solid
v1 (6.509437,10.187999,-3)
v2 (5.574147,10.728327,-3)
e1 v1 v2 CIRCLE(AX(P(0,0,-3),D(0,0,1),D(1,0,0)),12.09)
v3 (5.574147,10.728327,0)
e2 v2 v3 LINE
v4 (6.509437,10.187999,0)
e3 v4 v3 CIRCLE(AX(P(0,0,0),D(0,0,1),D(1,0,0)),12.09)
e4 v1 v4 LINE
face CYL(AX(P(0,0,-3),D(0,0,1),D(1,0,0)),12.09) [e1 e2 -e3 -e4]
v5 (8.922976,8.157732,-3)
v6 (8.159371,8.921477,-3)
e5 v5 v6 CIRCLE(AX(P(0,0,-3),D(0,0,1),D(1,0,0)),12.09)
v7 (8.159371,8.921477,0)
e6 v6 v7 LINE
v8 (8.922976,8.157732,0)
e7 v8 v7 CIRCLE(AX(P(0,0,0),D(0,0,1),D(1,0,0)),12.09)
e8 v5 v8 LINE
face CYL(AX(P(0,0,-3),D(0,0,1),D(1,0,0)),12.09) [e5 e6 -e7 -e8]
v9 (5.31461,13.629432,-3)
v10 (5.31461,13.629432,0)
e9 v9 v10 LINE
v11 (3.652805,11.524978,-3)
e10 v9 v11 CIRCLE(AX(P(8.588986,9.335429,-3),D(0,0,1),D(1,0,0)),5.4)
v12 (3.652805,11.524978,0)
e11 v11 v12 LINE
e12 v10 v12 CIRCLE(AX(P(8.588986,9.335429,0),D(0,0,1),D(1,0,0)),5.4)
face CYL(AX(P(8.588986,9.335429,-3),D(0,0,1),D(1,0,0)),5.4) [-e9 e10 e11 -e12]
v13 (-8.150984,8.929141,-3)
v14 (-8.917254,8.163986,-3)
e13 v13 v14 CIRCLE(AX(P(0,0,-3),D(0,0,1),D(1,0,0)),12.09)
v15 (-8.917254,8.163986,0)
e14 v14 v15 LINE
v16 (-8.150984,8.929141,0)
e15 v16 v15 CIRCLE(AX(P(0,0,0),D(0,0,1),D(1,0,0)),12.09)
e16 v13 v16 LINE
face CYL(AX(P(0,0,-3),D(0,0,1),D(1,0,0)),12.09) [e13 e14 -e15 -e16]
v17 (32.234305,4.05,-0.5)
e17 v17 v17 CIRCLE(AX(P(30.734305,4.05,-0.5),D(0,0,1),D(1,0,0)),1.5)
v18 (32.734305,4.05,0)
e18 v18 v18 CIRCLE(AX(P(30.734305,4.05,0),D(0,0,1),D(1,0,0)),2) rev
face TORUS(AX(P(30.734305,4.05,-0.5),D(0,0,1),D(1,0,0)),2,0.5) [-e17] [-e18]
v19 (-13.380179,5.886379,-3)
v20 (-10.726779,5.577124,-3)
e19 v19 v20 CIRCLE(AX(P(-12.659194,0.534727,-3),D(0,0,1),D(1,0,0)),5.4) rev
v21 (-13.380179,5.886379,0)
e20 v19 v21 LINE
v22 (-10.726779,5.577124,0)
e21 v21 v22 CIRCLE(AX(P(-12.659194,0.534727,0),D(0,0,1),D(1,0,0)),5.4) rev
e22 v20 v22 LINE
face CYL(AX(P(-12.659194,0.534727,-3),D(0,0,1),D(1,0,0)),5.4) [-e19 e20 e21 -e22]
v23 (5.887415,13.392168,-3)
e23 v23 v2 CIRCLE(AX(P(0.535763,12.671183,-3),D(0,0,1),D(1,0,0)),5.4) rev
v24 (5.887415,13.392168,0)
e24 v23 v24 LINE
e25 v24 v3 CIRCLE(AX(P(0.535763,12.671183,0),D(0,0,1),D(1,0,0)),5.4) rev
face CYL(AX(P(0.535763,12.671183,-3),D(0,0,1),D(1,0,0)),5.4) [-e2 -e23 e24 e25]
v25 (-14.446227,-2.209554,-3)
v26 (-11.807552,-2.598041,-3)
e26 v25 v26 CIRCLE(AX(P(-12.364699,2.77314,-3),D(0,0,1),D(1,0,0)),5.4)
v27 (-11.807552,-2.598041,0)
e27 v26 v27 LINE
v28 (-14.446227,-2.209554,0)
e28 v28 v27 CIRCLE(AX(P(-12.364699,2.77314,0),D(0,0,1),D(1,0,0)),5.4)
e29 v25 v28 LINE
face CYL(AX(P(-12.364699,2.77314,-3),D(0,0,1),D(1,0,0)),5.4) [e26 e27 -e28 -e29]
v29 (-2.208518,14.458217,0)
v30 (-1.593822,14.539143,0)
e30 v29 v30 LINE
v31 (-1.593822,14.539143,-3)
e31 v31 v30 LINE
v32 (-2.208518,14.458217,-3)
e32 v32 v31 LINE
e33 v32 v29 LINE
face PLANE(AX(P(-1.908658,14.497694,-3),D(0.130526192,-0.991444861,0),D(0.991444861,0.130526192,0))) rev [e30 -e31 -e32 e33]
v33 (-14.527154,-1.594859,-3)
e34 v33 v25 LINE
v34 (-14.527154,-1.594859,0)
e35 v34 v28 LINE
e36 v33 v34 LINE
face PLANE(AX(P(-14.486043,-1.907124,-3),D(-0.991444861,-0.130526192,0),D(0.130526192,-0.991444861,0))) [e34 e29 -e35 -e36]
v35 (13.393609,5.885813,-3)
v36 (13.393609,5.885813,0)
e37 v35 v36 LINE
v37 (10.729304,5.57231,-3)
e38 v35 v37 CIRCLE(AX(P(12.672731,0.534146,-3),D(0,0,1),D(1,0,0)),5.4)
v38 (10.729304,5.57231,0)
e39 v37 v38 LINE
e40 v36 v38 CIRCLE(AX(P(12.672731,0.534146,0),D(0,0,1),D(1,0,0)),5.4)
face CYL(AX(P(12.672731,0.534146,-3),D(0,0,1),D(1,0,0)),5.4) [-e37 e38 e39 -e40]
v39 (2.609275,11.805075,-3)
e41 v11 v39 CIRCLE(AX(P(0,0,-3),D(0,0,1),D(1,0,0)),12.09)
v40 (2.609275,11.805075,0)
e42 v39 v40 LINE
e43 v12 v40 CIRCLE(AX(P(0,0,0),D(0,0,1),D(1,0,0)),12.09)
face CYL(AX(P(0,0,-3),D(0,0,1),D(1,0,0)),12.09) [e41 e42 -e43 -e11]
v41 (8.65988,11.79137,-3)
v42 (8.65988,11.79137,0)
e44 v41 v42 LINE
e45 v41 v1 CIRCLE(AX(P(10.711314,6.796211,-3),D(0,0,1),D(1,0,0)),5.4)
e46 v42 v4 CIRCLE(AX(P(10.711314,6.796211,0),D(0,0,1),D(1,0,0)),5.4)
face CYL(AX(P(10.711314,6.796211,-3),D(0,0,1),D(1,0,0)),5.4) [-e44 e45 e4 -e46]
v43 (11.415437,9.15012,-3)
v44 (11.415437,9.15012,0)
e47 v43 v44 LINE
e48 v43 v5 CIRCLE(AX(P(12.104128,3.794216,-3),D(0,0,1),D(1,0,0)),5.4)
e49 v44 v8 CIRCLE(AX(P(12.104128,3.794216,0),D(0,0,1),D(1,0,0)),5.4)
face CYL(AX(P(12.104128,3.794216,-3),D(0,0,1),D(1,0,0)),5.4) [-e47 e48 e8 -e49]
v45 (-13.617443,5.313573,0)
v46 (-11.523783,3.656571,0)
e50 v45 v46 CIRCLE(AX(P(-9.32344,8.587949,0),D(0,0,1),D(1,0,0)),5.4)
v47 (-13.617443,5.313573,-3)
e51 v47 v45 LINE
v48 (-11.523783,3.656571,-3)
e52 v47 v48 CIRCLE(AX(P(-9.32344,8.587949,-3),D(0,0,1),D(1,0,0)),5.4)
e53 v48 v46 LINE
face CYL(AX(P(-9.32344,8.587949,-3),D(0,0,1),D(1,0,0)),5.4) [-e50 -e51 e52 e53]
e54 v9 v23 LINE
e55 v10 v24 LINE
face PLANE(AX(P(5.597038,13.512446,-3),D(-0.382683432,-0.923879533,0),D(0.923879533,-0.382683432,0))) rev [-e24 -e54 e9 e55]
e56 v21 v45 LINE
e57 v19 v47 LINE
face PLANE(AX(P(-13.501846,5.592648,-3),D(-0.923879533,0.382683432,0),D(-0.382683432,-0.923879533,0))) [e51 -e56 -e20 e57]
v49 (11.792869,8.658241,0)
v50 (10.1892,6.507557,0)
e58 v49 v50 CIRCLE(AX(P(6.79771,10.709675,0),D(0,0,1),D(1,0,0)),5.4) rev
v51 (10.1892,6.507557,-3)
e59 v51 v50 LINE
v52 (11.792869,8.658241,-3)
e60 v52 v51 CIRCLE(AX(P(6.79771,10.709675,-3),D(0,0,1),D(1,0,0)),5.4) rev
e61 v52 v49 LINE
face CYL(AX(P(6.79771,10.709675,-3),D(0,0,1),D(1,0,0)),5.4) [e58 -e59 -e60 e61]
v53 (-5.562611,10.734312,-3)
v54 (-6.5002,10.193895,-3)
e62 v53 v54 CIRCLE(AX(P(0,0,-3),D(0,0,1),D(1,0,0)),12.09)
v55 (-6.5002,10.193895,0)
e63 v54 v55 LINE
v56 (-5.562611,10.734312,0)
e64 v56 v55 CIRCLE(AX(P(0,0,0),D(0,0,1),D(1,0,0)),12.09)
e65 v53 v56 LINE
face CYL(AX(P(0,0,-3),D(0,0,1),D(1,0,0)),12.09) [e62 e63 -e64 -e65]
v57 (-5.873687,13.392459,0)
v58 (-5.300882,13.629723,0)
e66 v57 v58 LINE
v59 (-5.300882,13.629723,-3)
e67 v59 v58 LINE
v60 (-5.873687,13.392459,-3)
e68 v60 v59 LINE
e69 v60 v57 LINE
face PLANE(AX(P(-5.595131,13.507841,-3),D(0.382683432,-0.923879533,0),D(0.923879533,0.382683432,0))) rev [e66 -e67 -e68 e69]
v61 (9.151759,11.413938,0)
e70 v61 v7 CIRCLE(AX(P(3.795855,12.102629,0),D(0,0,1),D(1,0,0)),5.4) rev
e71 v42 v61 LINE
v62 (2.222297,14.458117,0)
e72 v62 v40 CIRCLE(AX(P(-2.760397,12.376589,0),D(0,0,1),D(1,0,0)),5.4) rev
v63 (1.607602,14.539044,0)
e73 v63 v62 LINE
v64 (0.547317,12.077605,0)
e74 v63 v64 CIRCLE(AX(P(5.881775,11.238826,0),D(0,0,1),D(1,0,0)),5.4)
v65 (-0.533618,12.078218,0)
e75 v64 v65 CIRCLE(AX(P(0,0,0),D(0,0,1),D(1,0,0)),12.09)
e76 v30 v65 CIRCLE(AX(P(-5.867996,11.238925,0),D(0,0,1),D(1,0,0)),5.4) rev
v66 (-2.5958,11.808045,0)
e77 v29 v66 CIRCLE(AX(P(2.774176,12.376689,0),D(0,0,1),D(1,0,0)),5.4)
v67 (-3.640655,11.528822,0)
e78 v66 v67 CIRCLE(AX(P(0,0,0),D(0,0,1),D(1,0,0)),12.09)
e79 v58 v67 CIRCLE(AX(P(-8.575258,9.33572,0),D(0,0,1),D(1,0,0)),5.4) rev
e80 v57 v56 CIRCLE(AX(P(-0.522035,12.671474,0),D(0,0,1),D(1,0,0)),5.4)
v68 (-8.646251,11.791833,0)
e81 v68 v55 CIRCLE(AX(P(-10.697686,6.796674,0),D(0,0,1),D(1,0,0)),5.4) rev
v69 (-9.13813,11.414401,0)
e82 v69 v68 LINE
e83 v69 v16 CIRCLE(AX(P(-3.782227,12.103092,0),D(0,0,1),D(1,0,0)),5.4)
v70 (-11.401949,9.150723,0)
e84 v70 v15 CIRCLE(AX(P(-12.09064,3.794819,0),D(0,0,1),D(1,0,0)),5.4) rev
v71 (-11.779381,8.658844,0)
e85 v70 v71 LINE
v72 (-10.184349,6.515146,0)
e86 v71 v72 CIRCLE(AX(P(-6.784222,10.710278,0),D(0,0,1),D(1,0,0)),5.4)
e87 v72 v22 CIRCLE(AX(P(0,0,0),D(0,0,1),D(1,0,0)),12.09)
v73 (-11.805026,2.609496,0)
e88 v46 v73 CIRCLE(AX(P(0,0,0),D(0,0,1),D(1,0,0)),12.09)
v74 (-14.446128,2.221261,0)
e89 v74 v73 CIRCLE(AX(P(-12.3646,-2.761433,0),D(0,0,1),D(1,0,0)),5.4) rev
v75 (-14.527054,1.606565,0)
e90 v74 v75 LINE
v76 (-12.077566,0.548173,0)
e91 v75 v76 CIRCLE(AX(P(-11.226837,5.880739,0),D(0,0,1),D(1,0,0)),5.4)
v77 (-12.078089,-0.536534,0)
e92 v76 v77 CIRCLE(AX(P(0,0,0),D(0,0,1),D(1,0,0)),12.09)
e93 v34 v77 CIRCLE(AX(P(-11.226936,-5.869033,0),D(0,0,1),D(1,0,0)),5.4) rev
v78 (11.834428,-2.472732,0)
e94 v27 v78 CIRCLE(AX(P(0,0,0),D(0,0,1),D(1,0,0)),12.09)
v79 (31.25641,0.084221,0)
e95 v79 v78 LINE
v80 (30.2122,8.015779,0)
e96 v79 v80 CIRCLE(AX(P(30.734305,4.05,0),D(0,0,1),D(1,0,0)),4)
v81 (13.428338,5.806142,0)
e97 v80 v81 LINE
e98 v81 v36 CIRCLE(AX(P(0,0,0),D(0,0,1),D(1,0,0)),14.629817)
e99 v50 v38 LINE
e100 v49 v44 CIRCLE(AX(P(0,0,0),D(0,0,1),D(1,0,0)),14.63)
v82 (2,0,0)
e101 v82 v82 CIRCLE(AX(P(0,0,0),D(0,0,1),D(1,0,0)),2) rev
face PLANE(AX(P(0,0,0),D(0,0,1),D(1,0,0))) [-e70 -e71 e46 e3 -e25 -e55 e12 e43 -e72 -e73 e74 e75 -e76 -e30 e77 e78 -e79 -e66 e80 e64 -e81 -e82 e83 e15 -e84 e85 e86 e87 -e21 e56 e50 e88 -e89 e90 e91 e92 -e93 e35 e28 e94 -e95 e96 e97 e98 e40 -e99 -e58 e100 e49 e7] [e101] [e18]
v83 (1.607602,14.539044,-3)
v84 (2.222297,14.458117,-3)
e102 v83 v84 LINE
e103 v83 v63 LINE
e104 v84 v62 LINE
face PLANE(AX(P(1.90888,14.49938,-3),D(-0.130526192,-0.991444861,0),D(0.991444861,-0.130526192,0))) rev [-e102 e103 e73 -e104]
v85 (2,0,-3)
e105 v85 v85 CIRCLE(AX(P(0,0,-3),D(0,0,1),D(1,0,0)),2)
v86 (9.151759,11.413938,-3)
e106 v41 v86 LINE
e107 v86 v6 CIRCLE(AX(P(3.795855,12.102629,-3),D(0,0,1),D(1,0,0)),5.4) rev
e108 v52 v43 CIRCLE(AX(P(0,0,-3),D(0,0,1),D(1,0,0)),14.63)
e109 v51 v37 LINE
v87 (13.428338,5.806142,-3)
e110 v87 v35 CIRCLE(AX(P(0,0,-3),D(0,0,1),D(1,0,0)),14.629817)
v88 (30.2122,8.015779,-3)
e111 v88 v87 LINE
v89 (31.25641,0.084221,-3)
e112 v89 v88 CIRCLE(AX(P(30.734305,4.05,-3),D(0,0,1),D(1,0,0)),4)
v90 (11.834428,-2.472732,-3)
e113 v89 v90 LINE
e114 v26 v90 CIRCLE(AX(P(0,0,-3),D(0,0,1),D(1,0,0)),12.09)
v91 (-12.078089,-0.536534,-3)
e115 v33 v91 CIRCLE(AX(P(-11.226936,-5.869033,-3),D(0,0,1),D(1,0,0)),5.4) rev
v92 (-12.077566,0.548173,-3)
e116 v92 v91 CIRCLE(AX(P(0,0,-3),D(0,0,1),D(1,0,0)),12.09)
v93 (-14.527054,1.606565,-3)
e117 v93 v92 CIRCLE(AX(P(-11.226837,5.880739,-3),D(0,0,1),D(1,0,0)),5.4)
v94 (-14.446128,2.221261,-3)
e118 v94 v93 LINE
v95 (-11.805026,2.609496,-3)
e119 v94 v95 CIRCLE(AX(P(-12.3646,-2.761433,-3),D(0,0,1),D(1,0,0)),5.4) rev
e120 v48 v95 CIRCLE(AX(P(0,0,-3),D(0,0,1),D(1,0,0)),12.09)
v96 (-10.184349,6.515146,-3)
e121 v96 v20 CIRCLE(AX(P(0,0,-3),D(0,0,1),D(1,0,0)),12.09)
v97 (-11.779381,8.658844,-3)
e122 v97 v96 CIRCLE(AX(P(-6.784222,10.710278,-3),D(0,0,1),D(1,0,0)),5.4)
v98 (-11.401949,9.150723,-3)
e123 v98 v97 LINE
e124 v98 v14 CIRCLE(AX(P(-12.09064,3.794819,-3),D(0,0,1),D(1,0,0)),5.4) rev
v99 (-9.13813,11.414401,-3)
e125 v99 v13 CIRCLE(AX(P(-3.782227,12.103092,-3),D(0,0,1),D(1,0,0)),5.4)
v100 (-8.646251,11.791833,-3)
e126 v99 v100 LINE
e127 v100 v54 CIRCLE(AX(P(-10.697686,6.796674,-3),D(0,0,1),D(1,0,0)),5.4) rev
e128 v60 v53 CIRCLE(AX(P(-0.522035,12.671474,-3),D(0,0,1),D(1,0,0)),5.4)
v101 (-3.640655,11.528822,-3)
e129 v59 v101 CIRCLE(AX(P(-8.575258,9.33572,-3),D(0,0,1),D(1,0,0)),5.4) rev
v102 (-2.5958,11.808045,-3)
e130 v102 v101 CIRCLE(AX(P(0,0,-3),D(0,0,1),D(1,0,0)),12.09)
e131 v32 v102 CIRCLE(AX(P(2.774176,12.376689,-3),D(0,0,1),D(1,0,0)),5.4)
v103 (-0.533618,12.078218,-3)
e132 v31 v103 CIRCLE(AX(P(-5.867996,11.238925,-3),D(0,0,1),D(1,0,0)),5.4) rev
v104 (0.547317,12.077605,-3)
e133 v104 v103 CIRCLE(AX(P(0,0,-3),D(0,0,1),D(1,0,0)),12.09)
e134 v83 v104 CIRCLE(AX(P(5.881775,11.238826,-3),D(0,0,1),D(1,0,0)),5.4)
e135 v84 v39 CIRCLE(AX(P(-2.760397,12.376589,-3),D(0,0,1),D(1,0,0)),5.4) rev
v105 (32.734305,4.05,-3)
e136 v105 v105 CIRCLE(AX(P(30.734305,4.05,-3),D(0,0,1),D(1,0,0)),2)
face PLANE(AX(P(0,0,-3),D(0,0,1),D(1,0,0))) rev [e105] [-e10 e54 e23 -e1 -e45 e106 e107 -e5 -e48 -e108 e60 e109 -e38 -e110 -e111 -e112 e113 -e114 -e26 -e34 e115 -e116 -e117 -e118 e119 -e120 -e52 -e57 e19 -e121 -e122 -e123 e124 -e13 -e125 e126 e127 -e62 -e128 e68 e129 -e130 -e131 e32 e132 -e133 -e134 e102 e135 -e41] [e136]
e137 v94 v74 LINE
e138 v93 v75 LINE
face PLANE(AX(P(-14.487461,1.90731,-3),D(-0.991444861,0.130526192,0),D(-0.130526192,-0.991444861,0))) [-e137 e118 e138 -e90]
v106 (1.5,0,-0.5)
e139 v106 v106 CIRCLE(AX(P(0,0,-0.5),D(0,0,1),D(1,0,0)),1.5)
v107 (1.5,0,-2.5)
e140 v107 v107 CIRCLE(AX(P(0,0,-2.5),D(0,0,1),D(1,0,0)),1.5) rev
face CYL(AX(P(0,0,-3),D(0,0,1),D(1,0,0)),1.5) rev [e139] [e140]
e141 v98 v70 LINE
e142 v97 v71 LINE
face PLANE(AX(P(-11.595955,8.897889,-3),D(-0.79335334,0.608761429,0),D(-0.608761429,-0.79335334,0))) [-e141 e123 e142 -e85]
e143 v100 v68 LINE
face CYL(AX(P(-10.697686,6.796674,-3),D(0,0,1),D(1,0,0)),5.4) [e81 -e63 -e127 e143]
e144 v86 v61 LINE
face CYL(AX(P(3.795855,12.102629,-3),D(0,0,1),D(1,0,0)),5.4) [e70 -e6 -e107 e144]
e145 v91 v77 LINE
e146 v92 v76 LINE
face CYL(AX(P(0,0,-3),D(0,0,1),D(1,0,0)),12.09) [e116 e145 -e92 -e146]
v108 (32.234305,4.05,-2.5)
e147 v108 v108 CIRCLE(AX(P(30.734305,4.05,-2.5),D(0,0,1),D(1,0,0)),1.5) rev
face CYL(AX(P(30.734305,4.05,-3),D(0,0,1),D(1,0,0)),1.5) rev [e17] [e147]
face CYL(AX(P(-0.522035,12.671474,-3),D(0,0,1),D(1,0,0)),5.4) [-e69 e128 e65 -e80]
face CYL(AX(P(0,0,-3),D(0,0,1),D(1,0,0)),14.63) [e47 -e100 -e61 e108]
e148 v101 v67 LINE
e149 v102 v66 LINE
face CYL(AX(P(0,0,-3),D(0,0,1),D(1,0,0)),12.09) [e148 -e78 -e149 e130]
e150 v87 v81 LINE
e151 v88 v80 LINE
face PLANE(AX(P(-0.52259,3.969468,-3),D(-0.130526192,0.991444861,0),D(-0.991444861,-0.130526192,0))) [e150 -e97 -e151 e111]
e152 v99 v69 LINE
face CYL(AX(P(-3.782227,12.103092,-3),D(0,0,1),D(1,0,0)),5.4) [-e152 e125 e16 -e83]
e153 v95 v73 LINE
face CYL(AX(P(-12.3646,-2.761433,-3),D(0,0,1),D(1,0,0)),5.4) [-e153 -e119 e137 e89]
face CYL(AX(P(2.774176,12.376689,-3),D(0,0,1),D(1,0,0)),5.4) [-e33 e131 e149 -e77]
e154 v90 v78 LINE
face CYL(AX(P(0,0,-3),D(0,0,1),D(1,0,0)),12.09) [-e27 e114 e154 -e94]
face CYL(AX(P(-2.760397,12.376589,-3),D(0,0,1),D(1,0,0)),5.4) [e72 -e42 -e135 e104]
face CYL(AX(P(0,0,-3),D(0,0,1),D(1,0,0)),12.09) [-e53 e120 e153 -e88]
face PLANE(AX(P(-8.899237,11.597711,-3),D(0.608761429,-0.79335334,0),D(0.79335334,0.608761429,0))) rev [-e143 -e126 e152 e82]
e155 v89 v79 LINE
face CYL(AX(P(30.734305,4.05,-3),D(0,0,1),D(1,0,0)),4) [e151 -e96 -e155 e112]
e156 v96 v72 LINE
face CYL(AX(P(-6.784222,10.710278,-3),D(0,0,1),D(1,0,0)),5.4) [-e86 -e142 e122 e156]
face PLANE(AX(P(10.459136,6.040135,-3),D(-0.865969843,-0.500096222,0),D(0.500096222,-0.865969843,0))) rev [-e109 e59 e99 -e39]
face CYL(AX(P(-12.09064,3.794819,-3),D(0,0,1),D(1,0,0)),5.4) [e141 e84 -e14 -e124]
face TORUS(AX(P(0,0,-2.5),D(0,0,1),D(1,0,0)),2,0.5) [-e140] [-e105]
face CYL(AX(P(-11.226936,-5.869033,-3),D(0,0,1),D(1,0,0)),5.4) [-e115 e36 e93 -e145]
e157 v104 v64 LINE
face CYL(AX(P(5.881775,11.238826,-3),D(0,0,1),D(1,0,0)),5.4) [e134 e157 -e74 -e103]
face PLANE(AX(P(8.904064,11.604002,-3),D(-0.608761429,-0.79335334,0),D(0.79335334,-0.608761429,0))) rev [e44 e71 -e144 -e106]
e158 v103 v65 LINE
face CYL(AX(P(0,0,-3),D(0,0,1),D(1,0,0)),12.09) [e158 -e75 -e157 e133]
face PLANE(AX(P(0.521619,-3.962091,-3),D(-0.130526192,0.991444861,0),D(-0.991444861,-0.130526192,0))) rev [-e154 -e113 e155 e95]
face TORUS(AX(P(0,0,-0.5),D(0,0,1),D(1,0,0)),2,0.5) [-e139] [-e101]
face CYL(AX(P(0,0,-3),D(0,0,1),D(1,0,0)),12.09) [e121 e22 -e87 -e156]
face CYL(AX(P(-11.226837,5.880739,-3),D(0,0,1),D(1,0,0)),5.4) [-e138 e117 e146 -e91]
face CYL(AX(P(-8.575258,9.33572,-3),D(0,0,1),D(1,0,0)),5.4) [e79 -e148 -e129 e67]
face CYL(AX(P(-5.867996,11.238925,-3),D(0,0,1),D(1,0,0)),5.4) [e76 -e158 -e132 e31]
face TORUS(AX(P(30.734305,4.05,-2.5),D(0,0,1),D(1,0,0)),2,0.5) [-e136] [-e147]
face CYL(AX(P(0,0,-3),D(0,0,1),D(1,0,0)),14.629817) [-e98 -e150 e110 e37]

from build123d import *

# Parameters (mm, degrees)
BOSS_EXTRUDE1_START     = -3
BOSS_EXTRUDE1_OUTLINE_R = 1.5
BOSS_EXTRUDE1_DEPTH     = 3
FILLET1_R               = 0.5


# Read off the part's stored shape, not the designer's step: Boss-Extrude1
with BuildPart() as part:
    # Boss-Extrude1 outline → Boss-Extrude1 (new body)
    with BuildSketch(Plane.XY.offset(BOSS_EXTRUDE1_START)):
        with BuildLine():
            Line((11.834428484, -2.472731782), (31.256409707, 0.084220555))
            ThreePointArc((31.256409707, 0.084220555), (34.700084383, 4.572104769), (30.212200169, 8.015779445))
            Line((30.212200169, 8.015779445), (13.428337838, 5.806142051))
            ThreePointArc((13.428337838, 5.806142051), (13.411032377, 5.846003182), (13.39360859, 5.885812734))
            ThreePointArc((13.39360859, 5.885812734), (12.04167814, 5.897146383), (10.729304164, 5.572309592))
            Line((10.729304164, 5.572309592), (10.189200244, 6.507557022))
            ThreePointArc((10.189200244, 6.507557022), (11.126720661, 7.481723913), (11.792869471, 8.658240563))
            ThreePointArc((11.792869471, 8.658240563), (11.606759368, 8.906179706), (11.415437385, 9.150119633))
            ThreePointArc((11.415437385, 9.150119633), (10.106597569, 8.81117421), (8.922976471, 8.15773197))
            ThreePointArc((8.922976471, 8.15773197), (8.549706323, 8.548135574), (8.159371308, 8.921477448))
            ThreePointArc((8.159371308, 8.921477448), (8.812813548, 10.105098546), (9.151758972, 11.413938362))
            Line((9.151758972, 11.413938362), (8.659879901, 11.791370448))
            ThreePointArc((8.659879901, 11.791370448), (7.483516811, 11.125336137), (6.509436976, 10.187999326))
            ThreePointArc((6.509436976, 10.187999326), (6.047829045, 10.468613272), (5.574146563, 10.728326528))
            ThreePointArc((5.574146563, 10.728326528), (5.898805358, 12.040487702), (5.887415057, 13.392168338))
            Line((5.887415057, 13.392168338), (5.314609747, 13.629432066))
            ThreePointArc((5.314609747, 13.629432066), (4.351003751, 12.681995862), (3.65280527, 11.524977816))
            ThreePointArc((3.65280527, 11.524977816), (3.134170467, 11.676689406), (2.609274564, 11.805074597))
            ThreePointArc((2.609274564, 11.805074597), (2.58305967, 13.15599481), (2.222297371, 14.458117388))
            Line((2.222297371, 14.458117388), (1.607601557, 14.539043627))
            ThreePointArc((1.607601557, 14.539043627), (0.922327421, 13.375148622), (0.547316802, 12.077605074))
            ThreePointArc((0.547316802, 12.077605074), (0.006856042, 12.089998056), (-0.533618427, 12.078218055))
            ThreePointArc((-0.533618427, 12.078218055), (-0.908651119, 13.375486662), (-1.593822374, 14.539142845))
            Line((-1.593822374, 14.539142845), (-2.208518188, 14.458216606))
            ThreePointArc((-2.208518188, 14.458216606), (-2.569071942, 13.157522433), (-2.595800172, 11.808044777))
            ThreePointArc((-2.595800172, 11.808044777), (-3.121351418, 11.680122659), (-3.640655008, 11.528821757))
            ThreePointArc((-3.640655008, 11.528821757), (-4.338480819, 12.683812024), (-5.300881923, 13.629722958))
            Line((-5.300881923, 13.629722958), (-5.873687233, 13.39245923))
            ThreePointArc((-5.873687233, 13.39245923), (-5.885433032, 12.043808909), (-5.562611018, 10.734312212))
            ThreePointArc((-5.562611018, 10.734312212), (-6.037455135, 10.474599539), (-6.500199913, 10.193895285))
            ThreePointArc((-6.500199913, 10.193895285), (-7.47268922, 11.127885908), (-8.646251294, 11.791833189))
            Line((-8.646251294, 11.791833189), (-9.138130365, 11.414401103))
            ThreePointArc((-9.138130365, 11.414401103), (-8.80083054, 10.109699304), (-8.150983569, 8.92914144))
            ThreePointArc((-8.150983569, 8.92914144), (-8.542690029, 8.555147402), (-8.917254459, 8.163986338))
            ThreePointArc((-8.917254459, 8.163986338), (-10.097571821, 8.813551755), (-11.401949093, 9.15072269))
            Line((-11.401949093, 9.15072269), (-11.779381179, 8.658843619))
            ThreePointArc((-11.779381179, 8.658843619), (-11.116550367, 7.486781519), (-10.184349411, 6.515145975))
            ThreePointArc((-10.184349411, 6.515145975), (-10.46607819, 6.052215075), (-10.726778871, 5.577124264))
            ThreePointArc((-10.726778871, 5.577124264), (-12.034053776, 5.89841947), (-13.38017907, 5.886378776))
            Line((-13.38017907, 5.886378776), (-13.617442798, 5.313573465))
            ThreePointArc((-13.617442798, 5.313573465), (-12.674640857, 4.353631081), (-11.523783462, 3.656571444))
            ThreePointArc((-11.523783462, 3.656571444), (-11.67614775, 3.13618777), (-11.805025713, 2.60949572))
            ThreePointArc((-11.805025713, 2.60949572), (-13.149945407, 2.581153618), (-14.44612812, 2.221261089))
            Line((-14.44612812, 2.221261089), (-14.527054359, 1.606565275))
            ThreePointArc((-14.527054359, 1.606565275), (-13.368714152, 0.923687604), (-12.07756623, 0.548173302))
            ThreePointArc((-12.07756623, 0.548173302), (-12.089998597, 0.005825389), (-12.07808888, -0.536534252))
            ThreePointArc((-12.07808888, -0.536534252), (-13.369010177, -0.912066026), (-14.527153576, -1.594858655))
            Line((-14.527153576, -1.594858655), (-14.446227337, -2.20955447))
            ThreePointArc((-14.446227337, -2.20955447), (-13.151251636, -2.569269431), (-11.807551859, -2.598041398))
            ThreePointArc((-11.807551859, -2.598041398), (0.064079741, -12.08983018), (11.834428484, -2.472731782))
        make_face()
        Circle(BOSS_EXTRUDE1_OUTLINE_R, mode=Mode.SUBTRACT)
        with Locations((30.734304938, 4.05)):
            Circle(BOSS_EXTRUDE1_OUTLINE_R, mode=Mode.SUBTRACT)
    extrude(amount=BOSS_EXTRUDE1_DEPTH)

    # Fillet1
    fillet1_edges = [part.edges().sort_by_distance(p)[0] for p in [
        (29.234304938, 4.05, -3),
        (29.234304938, 4.05, 0),
        (-1.5, 0, 0),
        (-1.5, 0, -3),
    ]]
    fillet(fillet1_edges, radius=FILLET1_R)


solid = part.part
